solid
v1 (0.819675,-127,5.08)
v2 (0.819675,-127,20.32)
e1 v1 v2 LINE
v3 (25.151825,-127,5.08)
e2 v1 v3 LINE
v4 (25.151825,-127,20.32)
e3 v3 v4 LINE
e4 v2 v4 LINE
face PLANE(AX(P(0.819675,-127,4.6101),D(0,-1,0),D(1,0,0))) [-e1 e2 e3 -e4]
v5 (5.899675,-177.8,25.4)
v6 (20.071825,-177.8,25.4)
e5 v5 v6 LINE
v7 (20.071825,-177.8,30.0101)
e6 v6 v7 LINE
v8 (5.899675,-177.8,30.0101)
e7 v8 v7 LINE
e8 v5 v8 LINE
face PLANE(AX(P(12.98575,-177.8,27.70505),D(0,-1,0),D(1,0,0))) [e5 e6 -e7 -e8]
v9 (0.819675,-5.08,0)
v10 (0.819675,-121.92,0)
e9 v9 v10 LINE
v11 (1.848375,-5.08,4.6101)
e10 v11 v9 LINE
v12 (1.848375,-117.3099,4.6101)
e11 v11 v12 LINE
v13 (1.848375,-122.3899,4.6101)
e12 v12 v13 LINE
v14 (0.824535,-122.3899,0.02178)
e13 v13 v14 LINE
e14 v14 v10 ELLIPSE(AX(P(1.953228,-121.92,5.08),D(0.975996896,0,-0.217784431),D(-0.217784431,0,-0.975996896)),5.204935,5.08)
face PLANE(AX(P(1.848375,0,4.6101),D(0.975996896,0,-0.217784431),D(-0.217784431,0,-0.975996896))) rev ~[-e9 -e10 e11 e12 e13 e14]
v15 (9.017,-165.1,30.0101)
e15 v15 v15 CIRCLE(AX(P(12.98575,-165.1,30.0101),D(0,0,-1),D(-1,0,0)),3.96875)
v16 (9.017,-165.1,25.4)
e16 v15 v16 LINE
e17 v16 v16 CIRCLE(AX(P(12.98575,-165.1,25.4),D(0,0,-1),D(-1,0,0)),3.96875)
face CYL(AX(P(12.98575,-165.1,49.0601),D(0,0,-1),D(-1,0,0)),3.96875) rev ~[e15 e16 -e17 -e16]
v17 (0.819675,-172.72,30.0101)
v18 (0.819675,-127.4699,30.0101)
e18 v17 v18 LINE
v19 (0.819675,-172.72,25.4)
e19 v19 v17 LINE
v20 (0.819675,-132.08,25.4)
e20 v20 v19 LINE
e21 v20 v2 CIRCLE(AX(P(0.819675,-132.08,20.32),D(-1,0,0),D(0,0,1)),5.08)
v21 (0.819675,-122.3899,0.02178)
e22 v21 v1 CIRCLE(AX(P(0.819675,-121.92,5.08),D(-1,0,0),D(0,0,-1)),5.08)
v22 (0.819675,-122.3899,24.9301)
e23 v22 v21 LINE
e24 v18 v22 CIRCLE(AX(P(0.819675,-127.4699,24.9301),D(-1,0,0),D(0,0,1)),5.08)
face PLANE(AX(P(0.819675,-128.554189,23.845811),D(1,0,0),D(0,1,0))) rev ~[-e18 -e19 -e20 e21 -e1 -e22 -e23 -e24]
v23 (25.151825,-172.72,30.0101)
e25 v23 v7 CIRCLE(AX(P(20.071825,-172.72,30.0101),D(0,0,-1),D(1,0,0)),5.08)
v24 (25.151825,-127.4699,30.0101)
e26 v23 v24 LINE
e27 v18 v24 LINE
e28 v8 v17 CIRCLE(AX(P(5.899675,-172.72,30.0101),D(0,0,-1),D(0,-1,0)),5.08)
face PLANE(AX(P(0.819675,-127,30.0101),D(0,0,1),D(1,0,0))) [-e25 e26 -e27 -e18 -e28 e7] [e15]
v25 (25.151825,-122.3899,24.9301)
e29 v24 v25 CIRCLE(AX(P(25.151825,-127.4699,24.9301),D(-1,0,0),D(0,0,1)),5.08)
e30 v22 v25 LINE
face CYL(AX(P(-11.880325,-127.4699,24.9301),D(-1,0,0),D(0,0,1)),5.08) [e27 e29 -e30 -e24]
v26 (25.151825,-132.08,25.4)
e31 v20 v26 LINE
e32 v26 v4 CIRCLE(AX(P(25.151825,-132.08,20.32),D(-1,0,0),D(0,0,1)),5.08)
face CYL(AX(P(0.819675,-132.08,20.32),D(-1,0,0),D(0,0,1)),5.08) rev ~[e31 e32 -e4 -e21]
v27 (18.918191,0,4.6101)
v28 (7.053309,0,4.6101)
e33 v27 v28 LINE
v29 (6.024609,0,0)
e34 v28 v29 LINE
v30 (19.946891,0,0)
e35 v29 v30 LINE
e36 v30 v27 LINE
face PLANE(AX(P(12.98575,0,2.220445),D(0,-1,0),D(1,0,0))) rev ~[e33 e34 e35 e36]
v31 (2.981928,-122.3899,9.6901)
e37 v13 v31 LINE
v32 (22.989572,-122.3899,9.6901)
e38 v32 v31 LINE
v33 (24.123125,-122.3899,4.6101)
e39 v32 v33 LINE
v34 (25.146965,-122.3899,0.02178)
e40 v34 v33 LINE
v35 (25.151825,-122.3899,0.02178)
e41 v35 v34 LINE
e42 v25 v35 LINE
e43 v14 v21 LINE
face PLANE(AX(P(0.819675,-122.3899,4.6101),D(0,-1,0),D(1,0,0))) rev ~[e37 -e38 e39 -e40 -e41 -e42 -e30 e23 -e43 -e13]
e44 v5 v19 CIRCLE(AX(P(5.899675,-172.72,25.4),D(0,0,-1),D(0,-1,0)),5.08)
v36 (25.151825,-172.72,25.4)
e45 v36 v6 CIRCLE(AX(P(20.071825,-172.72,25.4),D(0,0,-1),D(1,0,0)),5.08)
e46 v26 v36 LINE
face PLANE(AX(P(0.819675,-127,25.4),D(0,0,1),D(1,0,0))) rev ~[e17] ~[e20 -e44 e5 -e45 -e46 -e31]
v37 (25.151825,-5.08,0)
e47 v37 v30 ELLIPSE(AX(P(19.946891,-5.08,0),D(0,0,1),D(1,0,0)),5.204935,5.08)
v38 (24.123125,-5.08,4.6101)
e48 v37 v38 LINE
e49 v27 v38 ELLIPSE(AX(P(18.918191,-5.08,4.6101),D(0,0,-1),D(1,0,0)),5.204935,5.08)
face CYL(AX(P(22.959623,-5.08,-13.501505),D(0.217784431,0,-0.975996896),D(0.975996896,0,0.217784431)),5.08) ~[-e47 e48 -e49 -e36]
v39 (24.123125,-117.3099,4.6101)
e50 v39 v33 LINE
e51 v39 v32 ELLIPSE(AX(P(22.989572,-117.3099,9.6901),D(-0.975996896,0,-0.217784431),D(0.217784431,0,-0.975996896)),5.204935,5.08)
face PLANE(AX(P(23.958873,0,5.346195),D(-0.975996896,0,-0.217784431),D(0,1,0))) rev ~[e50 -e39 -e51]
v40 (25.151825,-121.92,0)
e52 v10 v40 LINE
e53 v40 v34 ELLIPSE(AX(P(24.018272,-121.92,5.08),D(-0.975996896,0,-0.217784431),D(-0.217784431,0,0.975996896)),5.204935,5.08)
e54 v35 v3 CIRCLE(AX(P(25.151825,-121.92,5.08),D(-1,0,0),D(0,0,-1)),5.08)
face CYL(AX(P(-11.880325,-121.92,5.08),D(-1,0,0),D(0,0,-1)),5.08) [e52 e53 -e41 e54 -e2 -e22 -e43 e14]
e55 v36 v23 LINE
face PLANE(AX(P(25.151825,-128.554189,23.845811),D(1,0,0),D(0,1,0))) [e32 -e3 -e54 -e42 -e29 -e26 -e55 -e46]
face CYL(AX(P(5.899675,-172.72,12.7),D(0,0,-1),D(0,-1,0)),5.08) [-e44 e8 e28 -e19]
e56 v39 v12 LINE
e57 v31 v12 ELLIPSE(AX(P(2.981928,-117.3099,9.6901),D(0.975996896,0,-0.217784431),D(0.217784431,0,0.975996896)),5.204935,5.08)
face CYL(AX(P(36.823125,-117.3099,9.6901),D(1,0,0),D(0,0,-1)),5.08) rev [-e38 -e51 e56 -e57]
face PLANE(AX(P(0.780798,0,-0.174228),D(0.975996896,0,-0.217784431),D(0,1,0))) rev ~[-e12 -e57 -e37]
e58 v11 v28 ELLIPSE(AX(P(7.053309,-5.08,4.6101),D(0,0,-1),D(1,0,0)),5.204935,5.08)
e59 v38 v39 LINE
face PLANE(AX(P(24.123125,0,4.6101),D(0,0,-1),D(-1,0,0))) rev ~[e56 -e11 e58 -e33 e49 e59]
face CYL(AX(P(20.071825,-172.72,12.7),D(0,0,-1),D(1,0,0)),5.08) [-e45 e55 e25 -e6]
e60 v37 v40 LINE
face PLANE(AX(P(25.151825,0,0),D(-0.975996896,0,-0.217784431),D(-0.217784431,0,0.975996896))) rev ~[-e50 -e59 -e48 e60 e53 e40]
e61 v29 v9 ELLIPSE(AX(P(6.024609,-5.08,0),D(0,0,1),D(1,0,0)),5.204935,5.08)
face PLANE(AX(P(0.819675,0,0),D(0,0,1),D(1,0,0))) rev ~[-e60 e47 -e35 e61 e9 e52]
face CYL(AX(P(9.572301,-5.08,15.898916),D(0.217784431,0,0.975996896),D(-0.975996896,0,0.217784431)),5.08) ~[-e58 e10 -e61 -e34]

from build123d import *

# Parameters (mm, degrees)
F1_DEPTH      = 127
F2_W          = 24.3321505244
F2_H          = 4.6101
F3_DEPTH      = 25.4
F3_DEPTH_BACK = 4.6101
F4_W          = 24.3321505244
F4_H          = 4.6101
F5_DEPTH      = 50.8
F6_T1_DEPTH   = 24.3321505244
F6_T6_DEPTH   = 47.6747505244
F6_T9_DEPTH   = 49.7321505244
F6_T11_DEPTH  = 30.0101
F6_T13_DEPTH  = 30.1234781359
F6_T15_DEPTH  = 30.1234781359
F8_D          = 7.9375
F8_DEPTH      = 19.05
F8_TIP        = 2.3846655818


# Not quite as in the source:
# - a fillet or chamfer that OpenCascade refuses, or shapes differently, is made with other operations: its cross-section is extruded or revolved along the edge and cut away or added


with BuildPart() as f1:
    # F0 (on Front) → F1 (new body)
    with BuildSketch(Plane.XZ):
        Polygon((1.8483747378, 4.6101), (0.8196747378, 0), (25.1518252622, 0), (24.1231252622, 4.6101), align=None)
    extrude(amount=F1_DEPTH)

    # F2 (on face) → F3 (join, two sides)
    with BuildSketch(Plane.XY.offset(4.6101)) as f3_sk:
        with Locations((12.98575, -124.69495)):
            Rectangle(F2_W, F2_H)
    extrude(amount=F3_DEPTH)
    extrude(f3_sk.sketch, amount=-F3_DEPTH_BACK)

    # F4 (on face) → F5 (join)
    with BuildSketch(Plane.XZ.offset(127)):
        with Locations((12.98575, 27.70505)):
            Rectangle(F4_W, F4_H)
    extrude(amount=F5_DEPTH)

    # F6: fillet of radius 5.08 on 8 edges, made by hand

    # F6_s2 → F6_t1 (join)
    with BuildSketch(Plane.YZ.offset(0.8196747378)):
        with BuildLine():
            ThreePointArc((-132.08, 25.4), (-128.4878975516, 23.9121024484), (-127, 20.32))
            Line((-127, 20.32), (-127, 25.4))
            Line((-127, 25.4), (-132.08, 25.4))
        make_face()
    extrude(amount=F6_T1_DEPTH)


with BuildPart() as f6_tool4:
    # F6_s5 → F6_t6 (new body)
    with BuildSketch(Plane.YZ.offset(36.8231252622)):
        with BuildLine():
            ThreePointArc((-117.3099, 4.6101), (-120.9020024484, 6.0979975516), (-122.3899, 9.6901))
            Line((-122.3899, 9.6901), (-122.3899, 4.6101))
            Line((-122.3899, 4.6101), (-117.3099, 4.6101))
        make_face()
    extrude(amount=-F6_T6_DEPTH)

    split(bisect_by=Plane(origin=(0.780797517, 0, -0.1742275451), x_dir=(0, 1, 0), z_dir=(0.9759968962, 0, -0.2177844314)), keep=Keep.TOP)

    split(bisect_by=Plane(origin=(23.9588727172, 0, 5.3461947386), x_dir=(0, 1, 0), z_dir=(-0.9759968962, 0, -0.2177844314)), keep=Keep.TOP)


with BuildPart() as f1_1:
    add(f1.part)

    # F6_t3: union F6_tool4
    add(f6_tool4.part)

    # F6_s10 → F6_t9 (cut)
    with BuildSketch(Plane.YZ.offset(-11.8803252622)):
        with BuildLine():
            ThreePointArc((-127.4699, 30.0101), (-123.8777975516, 28.5222024484), (-122.3899, 24.9301))
            Line((-122.3899, 24.9301), (-122.3899, 30.0101))
            Line((-122.3899, 30.0101), (-127.4699, 30.0101))
        make_face()
        with BuildLine():
            ThreePointArc((-121.92, 0), (-125.5121024484, 1.4878975516), (-127, 5.08))
            Line((-127, 5.08), (-127, 0))
            Line((-127, 0), (-121.92, 0))
        make_face()
    extrude(amount=F6_T9_DEPTH, mode=Mode.SUBTRACT)

    # F6_s12 → F6_t11 (cut)
    with BuildSketch(Plane.XY.offset(12.7)):
        with BuildLine():
            ThreePointArc((5.8996747378, -177.8), (2.3075722894, -176.3121024484), (0.8196747378, -172.72))
            Line((0.8196747378, -172.72), (0.8196747378, -177.8))
            Line((0.8196747378, -177.8), (5.8996747378, -177.8))
        make_face()
        with BuildLine():
            ThreePointArc((25.1518252622, -172.72), (23.6639277106, -176.3121024484), (20.0718252622, -177.8))
            Line((20.0718252622, -177.8), (25.1518252622, -177.8))
            Line((25.1518252622, -177.8), (25.1518252622, -172.72))
        make_face()
    extrude(amount=F6_T11_DEPTH, mode=Mode.SUBTRACT)

    # F6_s14 → F6_t13 (cut)
    with BuildSketch(Plane(origin=(3.8334394995, 0, 17.1794881272), x_dir=(0, 1, 0), z_dir=(-0.2177844314, 0, -0.9759968962))):
        with BuildLine():
            ThreePointArc((-5.08, 0.8), (-1.4878975516, 2.2878975516), (0, 5.88))
            Line((0, 5.88), (0, 0.8))
            Line((0, 0.8), (-5.08, 0.8))
        make_face()
    extrude(amount=F6_T13_DEPTH, mode=Mode.SUBTRACT)

    # F6_s16 → F6_t15 (cut)
    with BuildSketch(Plane(origin=(3.9588148236, 0, -17.7413553206), x_dir=(0, 1, 0), z_dir=(-0.2177844314, 0, 0.9759968962))):
        with BuildLine():
            ThreePointArc((-5.08, -24.5481033904), (-1.4878975516, -23.0602058388), (0, -19.4681033904))
            Line((0, -19.4681033904), (0, -24.5481033904))
            Line((0, -24.5481033904), (-5.08, -24.5481033904))
        make_face()
    extrude(amount=F6_T15_DEPTH, mode=Mode.SUBTRACT)

    # F8
    with Locations(Plane.XY.offset(30.0101)):
        with Locations((12.98575, -165.1)):
            Hole(F8_D / 2, depth=F8_DEPTH)
            with Locations((0, 0, -(F8_DEPTH + F8_TIP / 2))):  # 118° drill point
                Cone(0, F8_D / 2, F8_TIP, mode=Mode.SUBTRACT)


solid = f1_1.part
